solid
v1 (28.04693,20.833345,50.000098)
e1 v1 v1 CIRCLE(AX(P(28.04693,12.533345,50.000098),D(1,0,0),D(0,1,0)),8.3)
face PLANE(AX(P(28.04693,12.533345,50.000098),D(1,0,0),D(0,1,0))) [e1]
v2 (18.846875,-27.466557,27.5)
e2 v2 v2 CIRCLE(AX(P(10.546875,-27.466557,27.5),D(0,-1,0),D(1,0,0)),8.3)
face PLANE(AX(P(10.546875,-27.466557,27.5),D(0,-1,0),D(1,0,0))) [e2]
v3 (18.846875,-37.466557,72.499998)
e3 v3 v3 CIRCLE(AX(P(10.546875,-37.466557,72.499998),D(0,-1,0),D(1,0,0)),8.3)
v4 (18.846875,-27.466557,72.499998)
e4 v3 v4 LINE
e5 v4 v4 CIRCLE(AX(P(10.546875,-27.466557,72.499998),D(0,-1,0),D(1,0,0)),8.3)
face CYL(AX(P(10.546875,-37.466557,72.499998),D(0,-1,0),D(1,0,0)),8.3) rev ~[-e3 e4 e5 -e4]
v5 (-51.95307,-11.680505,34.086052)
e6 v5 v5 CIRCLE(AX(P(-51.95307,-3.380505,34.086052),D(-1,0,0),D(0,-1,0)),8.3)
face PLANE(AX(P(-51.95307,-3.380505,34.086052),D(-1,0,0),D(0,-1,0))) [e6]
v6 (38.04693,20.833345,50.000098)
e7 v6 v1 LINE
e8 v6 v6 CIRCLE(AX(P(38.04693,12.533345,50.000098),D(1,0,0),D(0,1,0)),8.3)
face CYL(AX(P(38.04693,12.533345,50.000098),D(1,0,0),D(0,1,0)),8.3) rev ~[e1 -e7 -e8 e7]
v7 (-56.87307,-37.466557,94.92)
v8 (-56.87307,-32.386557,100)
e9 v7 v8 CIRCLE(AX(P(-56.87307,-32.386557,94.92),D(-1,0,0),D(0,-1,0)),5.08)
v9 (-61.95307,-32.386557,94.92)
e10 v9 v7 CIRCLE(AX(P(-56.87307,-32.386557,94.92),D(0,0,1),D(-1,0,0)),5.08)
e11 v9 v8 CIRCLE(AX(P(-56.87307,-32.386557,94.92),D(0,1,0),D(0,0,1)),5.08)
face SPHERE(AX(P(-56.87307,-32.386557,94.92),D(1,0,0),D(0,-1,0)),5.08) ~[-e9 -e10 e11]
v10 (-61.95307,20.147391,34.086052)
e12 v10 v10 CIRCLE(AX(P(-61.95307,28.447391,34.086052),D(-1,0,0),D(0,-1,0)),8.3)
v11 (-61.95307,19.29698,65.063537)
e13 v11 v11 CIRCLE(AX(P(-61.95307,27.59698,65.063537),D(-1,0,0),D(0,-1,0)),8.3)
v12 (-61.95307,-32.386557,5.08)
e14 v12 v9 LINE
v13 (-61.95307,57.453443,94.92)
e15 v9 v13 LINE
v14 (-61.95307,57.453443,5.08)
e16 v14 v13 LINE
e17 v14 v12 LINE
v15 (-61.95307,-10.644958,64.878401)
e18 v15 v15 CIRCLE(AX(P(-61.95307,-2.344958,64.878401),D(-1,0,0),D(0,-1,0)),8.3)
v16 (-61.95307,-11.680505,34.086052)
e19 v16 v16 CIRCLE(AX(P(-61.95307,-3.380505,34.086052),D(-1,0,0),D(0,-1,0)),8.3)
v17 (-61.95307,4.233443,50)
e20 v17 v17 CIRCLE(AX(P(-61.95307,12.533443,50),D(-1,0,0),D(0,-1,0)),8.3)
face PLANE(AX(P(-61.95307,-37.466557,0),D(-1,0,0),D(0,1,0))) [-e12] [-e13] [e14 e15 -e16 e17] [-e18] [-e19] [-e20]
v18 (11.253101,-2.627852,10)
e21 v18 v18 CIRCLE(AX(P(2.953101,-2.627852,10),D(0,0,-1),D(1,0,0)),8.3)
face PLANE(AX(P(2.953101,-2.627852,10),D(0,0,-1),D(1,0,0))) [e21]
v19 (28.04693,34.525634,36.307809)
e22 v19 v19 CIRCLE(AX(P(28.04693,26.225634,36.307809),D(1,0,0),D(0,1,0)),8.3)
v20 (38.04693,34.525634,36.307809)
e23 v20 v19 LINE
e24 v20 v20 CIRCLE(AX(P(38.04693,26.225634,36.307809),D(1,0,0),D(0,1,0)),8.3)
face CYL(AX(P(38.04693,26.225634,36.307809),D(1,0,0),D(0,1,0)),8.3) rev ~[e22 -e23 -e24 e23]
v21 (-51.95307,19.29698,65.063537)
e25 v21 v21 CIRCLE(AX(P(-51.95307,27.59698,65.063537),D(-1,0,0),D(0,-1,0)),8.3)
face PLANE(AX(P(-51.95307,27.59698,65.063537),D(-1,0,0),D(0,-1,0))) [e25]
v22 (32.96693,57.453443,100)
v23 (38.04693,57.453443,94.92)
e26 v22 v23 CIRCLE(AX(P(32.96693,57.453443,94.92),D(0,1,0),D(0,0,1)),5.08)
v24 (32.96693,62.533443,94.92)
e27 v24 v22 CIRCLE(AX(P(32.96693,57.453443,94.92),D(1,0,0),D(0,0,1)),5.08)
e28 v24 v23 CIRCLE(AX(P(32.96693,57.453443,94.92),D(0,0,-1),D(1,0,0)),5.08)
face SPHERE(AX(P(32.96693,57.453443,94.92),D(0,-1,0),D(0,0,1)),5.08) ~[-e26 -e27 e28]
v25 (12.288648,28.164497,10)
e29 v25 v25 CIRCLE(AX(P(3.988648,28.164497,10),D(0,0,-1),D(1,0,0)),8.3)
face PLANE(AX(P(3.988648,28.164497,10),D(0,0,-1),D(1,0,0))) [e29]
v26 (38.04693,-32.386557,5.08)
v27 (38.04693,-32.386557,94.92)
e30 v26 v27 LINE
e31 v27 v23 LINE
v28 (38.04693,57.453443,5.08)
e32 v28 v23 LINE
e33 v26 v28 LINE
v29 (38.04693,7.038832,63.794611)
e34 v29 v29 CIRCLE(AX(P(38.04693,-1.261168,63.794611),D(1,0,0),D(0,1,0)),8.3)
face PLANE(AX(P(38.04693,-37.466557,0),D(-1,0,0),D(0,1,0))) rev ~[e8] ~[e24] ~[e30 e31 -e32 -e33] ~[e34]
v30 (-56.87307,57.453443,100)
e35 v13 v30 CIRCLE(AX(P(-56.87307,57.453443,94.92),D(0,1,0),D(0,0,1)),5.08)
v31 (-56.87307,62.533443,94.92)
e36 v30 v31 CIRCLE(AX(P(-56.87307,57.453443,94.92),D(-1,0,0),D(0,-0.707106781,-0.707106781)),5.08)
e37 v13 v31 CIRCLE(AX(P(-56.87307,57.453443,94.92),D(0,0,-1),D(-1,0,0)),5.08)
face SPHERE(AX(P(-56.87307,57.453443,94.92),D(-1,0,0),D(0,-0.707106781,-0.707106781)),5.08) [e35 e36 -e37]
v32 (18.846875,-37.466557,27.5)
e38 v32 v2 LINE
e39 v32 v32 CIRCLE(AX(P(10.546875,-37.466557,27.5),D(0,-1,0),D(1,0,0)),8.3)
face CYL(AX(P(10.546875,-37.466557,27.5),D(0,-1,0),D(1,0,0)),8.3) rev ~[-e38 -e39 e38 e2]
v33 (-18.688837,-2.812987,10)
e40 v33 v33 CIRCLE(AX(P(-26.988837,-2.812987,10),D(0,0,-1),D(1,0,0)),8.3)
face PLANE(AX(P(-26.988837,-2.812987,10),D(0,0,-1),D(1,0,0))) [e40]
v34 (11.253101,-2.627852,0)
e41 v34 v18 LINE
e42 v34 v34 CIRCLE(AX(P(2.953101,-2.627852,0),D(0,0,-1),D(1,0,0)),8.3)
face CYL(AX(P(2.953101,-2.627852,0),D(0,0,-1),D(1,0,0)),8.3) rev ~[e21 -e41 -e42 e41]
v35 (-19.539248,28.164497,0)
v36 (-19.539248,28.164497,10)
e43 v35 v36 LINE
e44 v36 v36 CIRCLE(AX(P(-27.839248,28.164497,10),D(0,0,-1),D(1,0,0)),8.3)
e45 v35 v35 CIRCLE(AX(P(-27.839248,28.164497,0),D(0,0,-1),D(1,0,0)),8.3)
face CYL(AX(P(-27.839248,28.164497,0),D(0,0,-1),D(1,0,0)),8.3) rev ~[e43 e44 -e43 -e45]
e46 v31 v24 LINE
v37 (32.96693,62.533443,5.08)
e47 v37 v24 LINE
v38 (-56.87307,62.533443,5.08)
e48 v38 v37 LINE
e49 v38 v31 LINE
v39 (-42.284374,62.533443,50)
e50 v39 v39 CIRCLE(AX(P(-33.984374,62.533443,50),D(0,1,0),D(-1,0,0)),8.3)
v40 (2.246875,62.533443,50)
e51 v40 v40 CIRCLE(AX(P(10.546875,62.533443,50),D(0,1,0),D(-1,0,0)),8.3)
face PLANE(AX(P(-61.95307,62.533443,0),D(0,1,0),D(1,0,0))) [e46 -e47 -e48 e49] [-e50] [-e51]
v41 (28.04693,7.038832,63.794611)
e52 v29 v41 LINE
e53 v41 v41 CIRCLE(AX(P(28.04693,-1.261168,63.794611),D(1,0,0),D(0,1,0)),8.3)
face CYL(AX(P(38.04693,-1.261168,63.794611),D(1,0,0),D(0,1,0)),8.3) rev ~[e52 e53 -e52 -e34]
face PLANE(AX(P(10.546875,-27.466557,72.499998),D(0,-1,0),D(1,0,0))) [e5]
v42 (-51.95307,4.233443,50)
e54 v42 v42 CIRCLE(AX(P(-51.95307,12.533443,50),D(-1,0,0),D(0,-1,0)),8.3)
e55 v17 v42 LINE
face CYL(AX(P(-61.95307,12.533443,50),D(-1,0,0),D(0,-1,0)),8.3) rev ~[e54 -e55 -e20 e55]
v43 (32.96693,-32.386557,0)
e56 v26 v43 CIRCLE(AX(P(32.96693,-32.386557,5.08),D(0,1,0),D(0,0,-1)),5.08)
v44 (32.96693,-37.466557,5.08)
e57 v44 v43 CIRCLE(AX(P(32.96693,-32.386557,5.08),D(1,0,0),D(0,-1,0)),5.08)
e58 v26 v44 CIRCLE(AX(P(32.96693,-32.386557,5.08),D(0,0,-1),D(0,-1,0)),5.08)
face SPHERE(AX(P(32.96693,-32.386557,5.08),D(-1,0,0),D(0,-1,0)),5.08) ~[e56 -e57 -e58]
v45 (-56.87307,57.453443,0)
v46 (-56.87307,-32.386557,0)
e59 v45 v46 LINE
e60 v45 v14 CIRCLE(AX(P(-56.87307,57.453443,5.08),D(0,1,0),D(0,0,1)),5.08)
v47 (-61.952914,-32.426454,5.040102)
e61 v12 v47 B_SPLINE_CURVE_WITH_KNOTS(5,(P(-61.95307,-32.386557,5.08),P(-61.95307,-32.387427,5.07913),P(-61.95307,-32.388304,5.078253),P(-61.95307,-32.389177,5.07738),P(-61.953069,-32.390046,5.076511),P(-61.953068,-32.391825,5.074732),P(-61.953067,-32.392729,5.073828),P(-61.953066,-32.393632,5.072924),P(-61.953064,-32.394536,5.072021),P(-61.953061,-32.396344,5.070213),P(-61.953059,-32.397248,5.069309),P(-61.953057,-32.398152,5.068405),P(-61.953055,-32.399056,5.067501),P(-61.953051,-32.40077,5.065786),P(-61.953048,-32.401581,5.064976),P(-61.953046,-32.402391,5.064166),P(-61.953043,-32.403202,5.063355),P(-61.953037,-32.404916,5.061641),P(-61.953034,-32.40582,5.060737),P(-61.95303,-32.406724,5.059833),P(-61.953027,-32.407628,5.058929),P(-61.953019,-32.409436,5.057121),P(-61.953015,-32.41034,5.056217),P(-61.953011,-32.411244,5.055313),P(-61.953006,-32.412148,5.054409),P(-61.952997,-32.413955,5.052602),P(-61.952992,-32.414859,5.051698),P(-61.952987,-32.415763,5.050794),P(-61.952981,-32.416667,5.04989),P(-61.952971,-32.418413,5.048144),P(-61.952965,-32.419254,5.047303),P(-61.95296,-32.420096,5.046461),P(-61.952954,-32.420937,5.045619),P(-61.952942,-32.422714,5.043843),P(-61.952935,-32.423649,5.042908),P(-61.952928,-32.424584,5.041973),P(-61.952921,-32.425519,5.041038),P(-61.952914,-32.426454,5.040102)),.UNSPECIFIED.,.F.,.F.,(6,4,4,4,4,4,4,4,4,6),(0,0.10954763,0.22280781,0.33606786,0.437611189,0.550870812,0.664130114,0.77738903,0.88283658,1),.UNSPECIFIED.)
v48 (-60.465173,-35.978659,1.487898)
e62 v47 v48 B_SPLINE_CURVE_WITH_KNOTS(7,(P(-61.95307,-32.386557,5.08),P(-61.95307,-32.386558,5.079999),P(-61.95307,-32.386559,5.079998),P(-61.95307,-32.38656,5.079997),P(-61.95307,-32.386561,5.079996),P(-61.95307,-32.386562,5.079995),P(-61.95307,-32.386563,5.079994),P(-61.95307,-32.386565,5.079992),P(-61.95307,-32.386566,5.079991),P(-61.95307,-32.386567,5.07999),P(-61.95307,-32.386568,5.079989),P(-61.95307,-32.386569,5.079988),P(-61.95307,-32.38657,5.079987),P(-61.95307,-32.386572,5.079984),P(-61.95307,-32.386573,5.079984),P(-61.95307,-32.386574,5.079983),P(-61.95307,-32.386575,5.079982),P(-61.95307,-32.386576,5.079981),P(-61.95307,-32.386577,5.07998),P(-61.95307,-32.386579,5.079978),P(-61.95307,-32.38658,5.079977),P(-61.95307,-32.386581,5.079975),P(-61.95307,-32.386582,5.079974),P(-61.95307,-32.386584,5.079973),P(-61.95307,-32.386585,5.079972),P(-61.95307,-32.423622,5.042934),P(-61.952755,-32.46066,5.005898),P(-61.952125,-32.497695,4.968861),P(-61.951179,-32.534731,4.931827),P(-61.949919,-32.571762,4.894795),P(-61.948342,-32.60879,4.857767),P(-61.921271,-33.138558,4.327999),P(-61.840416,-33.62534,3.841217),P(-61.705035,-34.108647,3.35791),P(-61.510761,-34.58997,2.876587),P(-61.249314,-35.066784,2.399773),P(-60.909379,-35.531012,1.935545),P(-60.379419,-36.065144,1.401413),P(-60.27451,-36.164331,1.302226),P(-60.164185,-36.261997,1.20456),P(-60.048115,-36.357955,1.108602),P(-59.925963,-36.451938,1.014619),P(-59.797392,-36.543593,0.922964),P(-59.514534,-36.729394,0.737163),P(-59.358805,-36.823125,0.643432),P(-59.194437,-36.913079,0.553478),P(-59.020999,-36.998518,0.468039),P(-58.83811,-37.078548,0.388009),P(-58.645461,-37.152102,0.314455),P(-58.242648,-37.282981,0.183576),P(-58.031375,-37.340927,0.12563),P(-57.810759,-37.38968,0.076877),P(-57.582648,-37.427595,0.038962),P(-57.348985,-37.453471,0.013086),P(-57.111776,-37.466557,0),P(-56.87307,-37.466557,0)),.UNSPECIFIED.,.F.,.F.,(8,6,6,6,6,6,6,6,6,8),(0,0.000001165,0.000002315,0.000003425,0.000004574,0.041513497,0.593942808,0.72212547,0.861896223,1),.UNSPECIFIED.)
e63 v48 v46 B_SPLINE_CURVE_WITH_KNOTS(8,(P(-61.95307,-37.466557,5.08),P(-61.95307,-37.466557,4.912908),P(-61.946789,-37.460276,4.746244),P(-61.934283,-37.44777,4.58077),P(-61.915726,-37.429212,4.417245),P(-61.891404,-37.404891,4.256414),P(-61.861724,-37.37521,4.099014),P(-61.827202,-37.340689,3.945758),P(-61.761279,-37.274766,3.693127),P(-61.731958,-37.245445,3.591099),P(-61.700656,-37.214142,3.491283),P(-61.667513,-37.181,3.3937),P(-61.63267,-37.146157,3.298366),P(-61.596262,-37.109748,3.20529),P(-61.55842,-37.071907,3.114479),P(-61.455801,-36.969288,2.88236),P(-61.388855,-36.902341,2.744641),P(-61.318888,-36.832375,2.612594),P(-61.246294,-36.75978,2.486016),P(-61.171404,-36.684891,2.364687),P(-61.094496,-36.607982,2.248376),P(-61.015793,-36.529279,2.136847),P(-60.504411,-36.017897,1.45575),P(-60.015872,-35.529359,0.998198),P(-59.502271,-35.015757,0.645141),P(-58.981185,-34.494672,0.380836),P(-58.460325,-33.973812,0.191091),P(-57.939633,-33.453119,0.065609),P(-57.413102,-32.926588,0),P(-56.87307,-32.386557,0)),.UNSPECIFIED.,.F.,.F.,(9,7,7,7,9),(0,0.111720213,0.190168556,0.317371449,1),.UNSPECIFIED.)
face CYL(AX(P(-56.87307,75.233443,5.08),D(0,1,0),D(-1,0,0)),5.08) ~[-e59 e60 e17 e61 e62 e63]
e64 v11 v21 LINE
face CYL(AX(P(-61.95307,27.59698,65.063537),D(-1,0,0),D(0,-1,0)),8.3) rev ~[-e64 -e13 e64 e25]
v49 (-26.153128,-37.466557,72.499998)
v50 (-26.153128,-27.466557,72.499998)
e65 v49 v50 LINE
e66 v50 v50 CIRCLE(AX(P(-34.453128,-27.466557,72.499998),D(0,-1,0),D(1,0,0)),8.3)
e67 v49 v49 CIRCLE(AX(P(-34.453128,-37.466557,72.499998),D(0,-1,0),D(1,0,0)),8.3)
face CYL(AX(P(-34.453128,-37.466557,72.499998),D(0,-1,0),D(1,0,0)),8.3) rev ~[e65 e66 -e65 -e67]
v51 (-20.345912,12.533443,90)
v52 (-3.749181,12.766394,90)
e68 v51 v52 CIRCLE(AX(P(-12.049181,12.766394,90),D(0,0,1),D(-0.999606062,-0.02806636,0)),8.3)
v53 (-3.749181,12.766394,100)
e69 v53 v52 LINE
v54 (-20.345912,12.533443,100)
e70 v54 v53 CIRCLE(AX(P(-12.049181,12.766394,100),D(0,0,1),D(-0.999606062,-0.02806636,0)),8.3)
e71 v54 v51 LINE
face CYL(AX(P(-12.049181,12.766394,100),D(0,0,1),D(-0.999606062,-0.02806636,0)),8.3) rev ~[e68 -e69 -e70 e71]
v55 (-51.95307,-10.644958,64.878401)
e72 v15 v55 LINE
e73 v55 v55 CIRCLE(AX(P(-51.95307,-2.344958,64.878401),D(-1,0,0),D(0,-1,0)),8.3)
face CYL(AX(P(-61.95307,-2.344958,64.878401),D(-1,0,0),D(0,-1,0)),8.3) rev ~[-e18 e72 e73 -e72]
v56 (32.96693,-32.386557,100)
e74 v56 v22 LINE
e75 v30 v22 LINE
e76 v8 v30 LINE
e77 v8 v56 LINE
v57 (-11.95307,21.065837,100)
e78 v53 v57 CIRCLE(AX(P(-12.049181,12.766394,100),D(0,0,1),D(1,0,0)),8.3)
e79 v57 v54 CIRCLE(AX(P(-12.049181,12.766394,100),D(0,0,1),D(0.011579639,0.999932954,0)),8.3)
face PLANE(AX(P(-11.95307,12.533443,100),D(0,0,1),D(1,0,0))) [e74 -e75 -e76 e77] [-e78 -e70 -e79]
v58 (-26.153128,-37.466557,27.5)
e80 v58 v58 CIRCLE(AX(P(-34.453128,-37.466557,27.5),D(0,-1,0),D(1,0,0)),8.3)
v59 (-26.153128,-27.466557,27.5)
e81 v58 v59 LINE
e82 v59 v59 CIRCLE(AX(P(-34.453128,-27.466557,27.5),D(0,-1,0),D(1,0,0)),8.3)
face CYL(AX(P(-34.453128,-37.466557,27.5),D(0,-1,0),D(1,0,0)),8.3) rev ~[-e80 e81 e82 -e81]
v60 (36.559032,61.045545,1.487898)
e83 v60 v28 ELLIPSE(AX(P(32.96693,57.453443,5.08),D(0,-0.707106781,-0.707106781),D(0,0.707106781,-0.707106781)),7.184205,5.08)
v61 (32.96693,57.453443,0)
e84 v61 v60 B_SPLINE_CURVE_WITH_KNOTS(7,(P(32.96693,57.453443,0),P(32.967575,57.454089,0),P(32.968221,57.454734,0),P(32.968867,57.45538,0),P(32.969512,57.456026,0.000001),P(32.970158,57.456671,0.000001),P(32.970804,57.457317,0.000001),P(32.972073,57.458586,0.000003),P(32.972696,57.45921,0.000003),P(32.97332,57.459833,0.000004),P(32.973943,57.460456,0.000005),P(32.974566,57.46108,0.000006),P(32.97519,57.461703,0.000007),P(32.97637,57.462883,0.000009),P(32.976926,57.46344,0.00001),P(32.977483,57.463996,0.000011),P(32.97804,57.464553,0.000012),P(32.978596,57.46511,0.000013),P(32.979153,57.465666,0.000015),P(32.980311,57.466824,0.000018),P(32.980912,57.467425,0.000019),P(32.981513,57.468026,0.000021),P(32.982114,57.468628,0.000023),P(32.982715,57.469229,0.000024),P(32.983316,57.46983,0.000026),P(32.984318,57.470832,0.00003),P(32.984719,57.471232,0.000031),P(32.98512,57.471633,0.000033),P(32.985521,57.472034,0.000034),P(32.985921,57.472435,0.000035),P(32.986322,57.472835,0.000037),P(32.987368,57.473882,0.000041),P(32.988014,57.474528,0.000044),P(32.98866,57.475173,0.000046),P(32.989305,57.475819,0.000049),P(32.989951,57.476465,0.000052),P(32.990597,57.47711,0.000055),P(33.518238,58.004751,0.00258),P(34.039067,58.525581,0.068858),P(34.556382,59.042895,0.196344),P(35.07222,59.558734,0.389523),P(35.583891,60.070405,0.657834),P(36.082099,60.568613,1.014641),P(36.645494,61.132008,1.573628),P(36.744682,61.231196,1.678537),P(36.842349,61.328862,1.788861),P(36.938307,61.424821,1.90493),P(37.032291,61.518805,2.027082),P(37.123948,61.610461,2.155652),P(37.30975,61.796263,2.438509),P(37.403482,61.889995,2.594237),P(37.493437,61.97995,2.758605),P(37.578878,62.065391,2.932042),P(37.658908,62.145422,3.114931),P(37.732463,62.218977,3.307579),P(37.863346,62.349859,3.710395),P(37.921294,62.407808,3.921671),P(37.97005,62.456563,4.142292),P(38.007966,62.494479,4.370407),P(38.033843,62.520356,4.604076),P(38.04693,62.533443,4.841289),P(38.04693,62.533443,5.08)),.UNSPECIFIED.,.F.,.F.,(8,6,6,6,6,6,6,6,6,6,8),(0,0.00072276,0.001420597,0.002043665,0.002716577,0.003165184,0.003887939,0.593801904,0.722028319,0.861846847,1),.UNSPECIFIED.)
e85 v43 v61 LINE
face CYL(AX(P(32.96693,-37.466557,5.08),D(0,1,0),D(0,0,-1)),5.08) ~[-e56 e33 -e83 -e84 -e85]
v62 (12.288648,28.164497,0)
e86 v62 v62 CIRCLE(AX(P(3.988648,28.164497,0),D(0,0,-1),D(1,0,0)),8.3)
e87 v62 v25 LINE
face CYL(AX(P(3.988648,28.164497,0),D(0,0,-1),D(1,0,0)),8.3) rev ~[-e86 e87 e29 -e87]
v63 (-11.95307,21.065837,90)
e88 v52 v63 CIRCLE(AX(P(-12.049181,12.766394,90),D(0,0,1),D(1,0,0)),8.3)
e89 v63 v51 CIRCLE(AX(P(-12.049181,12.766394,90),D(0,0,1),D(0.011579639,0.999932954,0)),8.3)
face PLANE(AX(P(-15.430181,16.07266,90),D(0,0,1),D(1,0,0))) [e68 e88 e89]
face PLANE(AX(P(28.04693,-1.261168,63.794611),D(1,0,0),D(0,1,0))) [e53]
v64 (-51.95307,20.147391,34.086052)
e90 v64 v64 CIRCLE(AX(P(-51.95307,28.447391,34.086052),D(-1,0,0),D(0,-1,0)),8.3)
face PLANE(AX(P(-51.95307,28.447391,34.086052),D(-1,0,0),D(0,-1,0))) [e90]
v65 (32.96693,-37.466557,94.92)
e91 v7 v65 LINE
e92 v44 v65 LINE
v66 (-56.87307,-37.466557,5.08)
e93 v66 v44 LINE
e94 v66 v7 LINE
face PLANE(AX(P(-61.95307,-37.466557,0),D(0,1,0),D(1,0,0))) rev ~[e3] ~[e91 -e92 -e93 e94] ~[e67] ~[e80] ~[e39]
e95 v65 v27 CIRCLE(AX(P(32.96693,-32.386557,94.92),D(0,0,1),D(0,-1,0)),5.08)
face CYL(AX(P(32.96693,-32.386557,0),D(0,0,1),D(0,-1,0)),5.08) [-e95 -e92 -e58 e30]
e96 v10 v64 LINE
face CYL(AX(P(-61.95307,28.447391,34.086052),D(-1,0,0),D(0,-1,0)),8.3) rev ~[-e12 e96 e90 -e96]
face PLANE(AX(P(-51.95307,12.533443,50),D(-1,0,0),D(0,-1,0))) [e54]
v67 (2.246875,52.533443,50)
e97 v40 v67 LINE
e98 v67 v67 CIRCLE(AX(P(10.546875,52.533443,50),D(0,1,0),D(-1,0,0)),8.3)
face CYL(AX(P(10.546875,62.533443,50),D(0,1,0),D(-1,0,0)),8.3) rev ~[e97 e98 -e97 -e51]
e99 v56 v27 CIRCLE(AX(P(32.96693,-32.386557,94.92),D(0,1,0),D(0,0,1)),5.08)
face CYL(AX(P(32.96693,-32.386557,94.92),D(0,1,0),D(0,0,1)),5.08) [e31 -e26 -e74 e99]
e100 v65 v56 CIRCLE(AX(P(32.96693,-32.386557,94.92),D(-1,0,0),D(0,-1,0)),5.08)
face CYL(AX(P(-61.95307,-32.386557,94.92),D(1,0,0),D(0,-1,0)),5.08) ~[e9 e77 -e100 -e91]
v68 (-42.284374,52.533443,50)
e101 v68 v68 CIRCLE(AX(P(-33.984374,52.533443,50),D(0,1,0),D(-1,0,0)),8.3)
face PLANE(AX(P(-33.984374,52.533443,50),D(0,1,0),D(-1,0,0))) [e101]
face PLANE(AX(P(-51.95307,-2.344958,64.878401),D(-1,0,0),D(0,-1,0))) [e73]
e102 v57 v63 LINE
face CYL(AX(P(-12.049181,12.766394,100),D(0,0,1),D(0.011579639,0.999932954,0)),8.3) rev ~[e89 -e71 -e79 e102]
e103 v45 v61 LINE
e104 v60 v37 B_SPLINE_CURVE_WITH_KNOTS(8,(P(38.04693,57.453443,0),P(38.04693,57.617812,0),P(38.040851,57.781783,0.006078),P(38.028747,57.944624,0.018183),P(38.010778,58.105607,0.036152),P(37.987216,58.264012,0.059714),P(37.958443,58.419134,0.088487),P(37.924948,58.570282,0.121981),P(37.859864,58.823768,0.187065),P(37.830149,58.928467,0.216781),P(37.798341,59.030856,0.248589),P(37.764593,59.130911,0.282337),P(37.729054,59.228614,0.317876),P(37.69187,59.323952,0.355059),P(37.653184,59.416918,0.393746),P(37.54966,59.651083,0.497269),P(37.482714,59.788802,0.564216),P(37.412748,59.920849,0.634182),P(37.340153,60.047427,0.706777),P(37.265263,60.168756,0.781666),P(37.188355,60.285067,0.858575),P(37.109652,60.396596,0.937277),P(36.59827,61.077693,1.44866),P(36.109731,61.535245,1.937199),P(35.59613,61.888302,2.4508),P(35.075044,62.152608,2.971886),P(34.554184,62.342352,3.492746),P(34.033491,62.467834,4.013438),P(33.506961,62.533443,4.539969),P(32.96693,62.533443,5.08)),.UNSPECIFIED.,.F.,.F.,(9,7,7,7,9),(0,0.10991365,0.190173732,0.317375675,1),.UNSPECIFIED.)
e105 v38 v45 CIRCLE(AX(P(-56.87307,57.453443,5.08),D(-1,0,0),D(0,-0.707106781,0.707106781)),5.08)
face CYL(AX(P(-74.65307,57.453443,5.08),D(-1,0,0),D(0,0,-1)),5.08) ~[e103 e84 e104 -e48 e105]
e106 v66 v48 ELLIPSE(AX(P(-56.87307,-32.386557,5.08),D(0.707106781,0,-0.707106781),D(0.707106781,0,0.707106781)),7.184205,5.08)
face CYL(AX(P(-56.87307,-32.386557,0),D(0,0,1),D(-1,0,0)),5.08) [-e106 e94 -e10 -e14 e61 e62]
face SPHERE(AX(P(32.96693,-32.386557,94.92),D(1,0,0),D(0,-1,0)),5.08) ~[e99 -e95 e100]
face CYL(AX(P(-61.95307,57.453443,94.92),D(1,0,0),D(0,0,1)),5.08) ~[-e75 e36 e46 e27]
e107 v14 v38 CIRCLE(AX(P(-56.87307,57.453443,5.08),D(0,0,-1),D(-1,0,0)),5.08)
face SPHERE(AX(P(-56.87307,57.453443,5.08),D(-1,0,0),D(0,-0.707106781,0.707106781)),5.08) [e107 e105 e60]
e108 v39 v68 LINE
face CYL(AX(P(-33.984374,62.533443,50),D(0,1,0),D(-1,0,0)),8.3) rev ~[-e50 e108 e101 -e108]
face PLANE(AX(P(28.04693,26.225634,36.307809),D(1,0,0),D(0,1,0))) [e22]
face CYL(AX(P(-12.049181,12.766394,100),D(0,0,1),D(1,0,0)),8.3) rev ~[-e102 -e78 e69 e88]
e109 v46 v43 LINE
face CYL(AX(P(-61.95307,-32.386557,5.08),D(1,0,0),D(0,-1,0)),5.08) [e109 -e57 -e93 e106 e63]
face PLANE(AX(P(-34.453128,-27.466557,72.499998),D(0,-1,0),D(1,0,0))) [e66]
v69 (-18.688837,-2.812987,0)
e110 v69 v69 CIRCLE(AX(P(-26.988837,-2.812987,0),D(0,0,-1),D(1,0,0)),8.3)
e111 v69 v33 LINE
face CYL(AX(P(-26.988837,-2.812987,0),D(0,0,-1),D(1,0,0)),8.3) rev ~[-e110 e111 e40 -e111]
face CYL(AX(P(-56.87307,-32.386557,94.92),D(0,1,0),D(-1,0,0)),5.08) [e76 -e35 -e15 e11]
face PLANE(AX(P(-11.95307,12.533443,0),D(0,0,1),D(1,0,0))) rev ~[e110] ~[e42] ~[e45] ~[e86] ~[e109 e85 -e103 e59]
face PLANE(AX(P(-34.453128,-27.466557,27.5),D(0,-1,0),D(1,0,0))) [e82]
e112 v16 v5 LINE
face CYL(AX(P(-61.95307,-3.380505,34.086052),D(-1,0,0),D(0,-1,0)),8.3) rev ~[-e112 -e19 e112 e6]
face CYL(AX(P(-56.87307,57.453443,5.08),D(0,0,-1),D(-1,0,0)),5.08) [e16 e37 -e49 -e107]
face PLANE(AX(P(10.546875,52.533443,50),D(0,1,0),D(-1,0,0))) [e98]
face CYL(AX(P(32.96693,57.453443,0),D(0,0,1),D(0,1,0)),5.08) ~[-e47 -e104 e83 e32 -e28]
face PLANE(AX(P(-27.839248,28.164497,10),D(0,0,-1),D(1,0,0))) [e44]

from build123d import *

# Parameters (mm, degrees)
F0_W         = 100
F0_H         = 100
F1_DEPTH     = 100
F2_R         = 5.08
F3_R         = 5.08
F4_T1_DEPTH  = 120.32
F4_T3_DEPTH  = 120.32
F5_T1_DEPTH  = 89.84
F5_S5_W      = 5.08
F5_S5_H      = 5.08
F5_T6_DEPTH  = 5.08
F5_S11_W     = 5.08
F5_S11_H     = 5.08
F5_T12_DEPTH = 5.08
F8_DEPTH     = 10
F10_R        = 8.3
F11_DEPTH    = 10
F12_R        = 8.3
F13_DEPTH    = 10
F9_R         = 8.3
F14_DEPTH    = 10
F15_R        = 8.3
F16_DEPTH    = 10
F17_R        = 8.3
F18_DEPTH    = 10


# Not quite as in the source:
# - a fillet or chamfer that OpenCascade refuses, or shapes differently, is made with other operations: its cross-section is extruded or revolved along the edge and cut away or added


with BuildPart() as f1:
    # F0 (on Top) → F1 (new body)
    with BuildSketch(Plane.XY):
        with Locations((-11.9530703868, 12.5334430486)):
            Rectangle(F0_W, F0_H)
    extrude(amount=F1_DEPTH)

    # F2
    f2_edges = [f1.edges().sort_by_distance(p)[0] for p in [
        (-11.95307, -37.466557, 100),
    ]]
    fillet(f2_edges, radius=F2_R)

    # F3
    f3_edges = [f1.edges().sort_by_distance(p)[0] for p in [
        (-11.95307, -37.466557, 0),
        (38.04693, -37.466557, 47.46),
        (-61.95307, -37.466557, 47.46),
        (-11.95307, 62.533443, 100),
        (-61.95307, 15.073443, 100),
        (38.04693, 15.073443, 100),
        (38.04693, 12.533443, 0),
        (38.04693, 62.533443, 50),
    ]]
    fillet(f3_edges, radius=F3_R)

    # F4: fillet of radius 5.08 on 4 edges, made by hand

    # F4_s2 → F4_t1 (cut)
    with BuildSketch(Plane.YZ.offset(-74.6530703868)):
        with BuildLine():
            ThreePointArc((57.4534430486, 0), (61.045545497, 1.4878975516), (62.5334430486, 5.08))
            Line((62.5334430486, 5.08), (62.5334430486, 0))
            Line((62.5334430486, 0), (57.4534430486, 0))
        make_face()
    extrude(amount=F4_T1_DEPTH, mode=Mode.SUBTRACT)

    # F4_s4 → F4_t3 (cut)
    with BuildSketch(Plane.XZ.offset(-75.2334430486)):
        with BuildLine():
            ThreePointArc((-61.9530703868, 5.08), (-60.4651728352, 1.4878975516), (-56.8730703868, 0))
            Line((-56.8730703868, 0), (-61.9530703868, 0))
            Line((-61.9530703868, 0), (-61.9530703868, 5.08))
        make_face()
    extrude(amount=F4_T3_DEPTH, mode=Mode.SUBTRACT)

    # F5: fillet of radius 5.08 on 1 edges, made by hand

    # F5_s2 → F5_t1 (cut)
    with BuildSketch(Plane.XY.offset(5.08)):
        with BuildLine():
            ThreePointArc((-61.9530703868, 57.4534430486), (-60.4651728352, 61.045545497), (-56.8730703868, 62.5334430486))
            Line((-56.8730703868, 62.5334430486), (-61.9530703868, 62.5334430486))
            Line((-61.9530703868, 62.5334430486), (-61.9530703868, 57.4534430486))
        make_face()
    extrude(amount=F5_T1_DEPTH, mode=Mode.SUBTRACT)


with BuildPart() as f5_tool4:
    # F5_s5 → F5_t6 (new body)
    with BuildSketch(Plane.YZ.offset(-56.8730703868)):
        with Locations((59.9934430486, 2.54)):
            Rectangle(F5_S5_W, F5_S5_H)
    extrude(amount=-F5_T6_DEPTH)

    # F5_s7 → F5_t8 (revolve, cut)
    with BuildSketch(Plane(origin=(-56.8730703868, 57.4534430486, 5.08), x_dir=(0, -0.7071067812, 0.7071067812), z_dir=(0, -0.7071067812, -0.7071067812))):
        with BuildLine():
            ThreePointArc((0, -5.08), (5.08, 0), (0, 5.08))
            Line((0, 5.08), (0, -5.08))
        make_face()
    revolve(axis=Axis((-56.8730703868, 57.4534430486, 5.08), (-1, 0, 0)), mode=Mode.SUBTRACT)


with BuildPart() as f1_1:
    add(f1.part)

    # F5_t3: cut F5_tool4
    add(f5_tool4.part, mode=Mode.SUBTRACT)


with BuildPart() as f5_tool10:
    # F5_s11 → F5_t12 (new body)
    with BuildSketch(Plane.YZ.offset(-56.8730703868)):
        with Locations((59.9934430486, 97.46)):
            Rectangle(F5_S11_W, F5_S11_H)
    extrude(amount=-F5_T12_DEPTH)

    # F5_s13 → F5_t14 (revolve, cut)
    with BuildSketch(Plane(origin=(-56.8730703868, 57.4534430486, 94.92), x_dir=(0, -0.7071067812, -0.7071067812), z_dir=(0, 0.7071067812, -0.7071067812))):
        with BuildLine():
            ThreePointArc((0, -5.08), (5.08, 0), (0, 5.08))
            Line((0, 5.08), (0, -5.08))
        make_face()
    revolve(axis=Axis((-56.8730703868, 57.4534430486, 94.92), (-1, 0, 0)), mode=Mode.SUBTRACT)


with BuildPart() as f1_2:
    add(f1_1.part)

    # F5_t9: cut F5_tool10
    add(f5_tool10.part, mode=Mode.SUBTRACT)

    # F7 (on face) → F8 (cut)
    with BuildSketch(Plane.XY.offset(100)):
        with BuildLine():
            Line((-11.9530703868, 12.5334430486), (-11.9530703868, 21.0658373489))
            ThreePointArc((-11.9530703868, 21.0658373489), (-17.9663578599, 18.5867909487), (-20.3459117026, 12.5334430486))
            Line((-20.3459117026, 12.5334430486), (-11.9530703868, 12.5334430486))
        make_face()
        with BuildLine():
            ThreePointArc((-20.3459117026, 12.5334430486), (-11.932694522, 4.4672112942), (-3.7491813868, 12.7663938329))
            ThreePointArc((-3.7491813868, 12.7663938329), (-6.1463125377, 18.601300803), (-11.9530703868, 21.0658373489))
            Line((-11.9530703868, 21.0658373489), (-11.9530703868, 12.5334430486))
            Line((-11.9530703868, 12.5334430486), (-20.3459117026, 12.5334430486))
        make_face()
    extrude(amount=-F8_DEPTH, mode=Mode.SUBTRACT)

    # F10 (on face) → F11 (cut)
    with BuildSketch(Plane(origin=(0, 62.5334430486, 0), x_dir=(-1, 0, 0), z_dir=(0, 1, 0))):
        with Locations((-10.5468751863, 50)):
            Circle(F10_R)
        with Locations((33.9843742549, 50)):
            Circle(F10_R)
    extrude(amount=-F11_DEPTH, mode=Mode.SUBTRACT)

    # F12 (on face) → F13 (cut)
    with BuildSketch(Plane(origin=(0, 0, 0), x_dir=(1, 0, 0), z_dir=(0, 0, -1))):
        with Locations((-26.988836811, 2.8129873745)):
            Circle(F12_R)
        with Locations((2.9531012963, 2.62785203)):
            Circle(F12_R)
        with Locations((3.9886479591, -28.1644973956)):
            Circle(F12_R)
        with Locations((-27.8392481293, -28.1644973956)):
            Circle(F12_R)
    extrude(amount=-F13_DEPTH, mode=Mode.SUBTRACT)

    # F9 (on face) → F14 (cut)
    with BuildSketch(Plane(origin=(-61.9530703868, 0, 0), x_dir=(0, -1, 0), z_dir=(-1, 0, 0))):
        with Locations((-27.5969797745, 65.0635367259)):
            Circle(F9_R)
        with Locations((-12.5334430486, 50)):
            Circle(F9_R)
        with Locations((2.3449583328, 64.8784013814)):
            Circle(F9_R)
        with Locations((3.3805049956, 34.0860519558)):
            Circle(F9_R)
        with Locations((-28.4473910928, 34.0860519558)):
            Circle(F9_R)
    extrude(amount=-F14_DEPTH, mode=Mode.SUBTRACT)

    # F15 (on face) → F16 (cut)
    with BuildSketch(Plane.YZ.offset(38.0469296132)):
        with Locations((26.2256339981, 36.3078090505)):
            Circle(F15_R)
        with Locations((12.5333450089, 50.0000980397)):
            Circle(F15_R)
        with Locations((-1.261167958, 63.7946110066)):
            Circle(F15_R)
    extrude(amount=-F16_DEPTH, mode=Mode.SUBTRACT)

    # F17 (on face) → F18 (cut)
    with BuildSketch(Plane.XZ.offset(37.4665569514)):
        with Locations((10.5468751863, 27.499999851)):
            Circle(F17_R)
        with Locations((10.5468751863, 72.4999979138)):
            Circle(F17_R)
        with Locations((-34.4531275332, 72.4999979138)):
            Circle(F17_R)
        with Locations((-34.4531275332, 27.499999851)):
            Circle(F17_R)
    extrude(amount=-F18_DEPTH, mode=Mode.SUBTRACT)


solid = f1_2.part
